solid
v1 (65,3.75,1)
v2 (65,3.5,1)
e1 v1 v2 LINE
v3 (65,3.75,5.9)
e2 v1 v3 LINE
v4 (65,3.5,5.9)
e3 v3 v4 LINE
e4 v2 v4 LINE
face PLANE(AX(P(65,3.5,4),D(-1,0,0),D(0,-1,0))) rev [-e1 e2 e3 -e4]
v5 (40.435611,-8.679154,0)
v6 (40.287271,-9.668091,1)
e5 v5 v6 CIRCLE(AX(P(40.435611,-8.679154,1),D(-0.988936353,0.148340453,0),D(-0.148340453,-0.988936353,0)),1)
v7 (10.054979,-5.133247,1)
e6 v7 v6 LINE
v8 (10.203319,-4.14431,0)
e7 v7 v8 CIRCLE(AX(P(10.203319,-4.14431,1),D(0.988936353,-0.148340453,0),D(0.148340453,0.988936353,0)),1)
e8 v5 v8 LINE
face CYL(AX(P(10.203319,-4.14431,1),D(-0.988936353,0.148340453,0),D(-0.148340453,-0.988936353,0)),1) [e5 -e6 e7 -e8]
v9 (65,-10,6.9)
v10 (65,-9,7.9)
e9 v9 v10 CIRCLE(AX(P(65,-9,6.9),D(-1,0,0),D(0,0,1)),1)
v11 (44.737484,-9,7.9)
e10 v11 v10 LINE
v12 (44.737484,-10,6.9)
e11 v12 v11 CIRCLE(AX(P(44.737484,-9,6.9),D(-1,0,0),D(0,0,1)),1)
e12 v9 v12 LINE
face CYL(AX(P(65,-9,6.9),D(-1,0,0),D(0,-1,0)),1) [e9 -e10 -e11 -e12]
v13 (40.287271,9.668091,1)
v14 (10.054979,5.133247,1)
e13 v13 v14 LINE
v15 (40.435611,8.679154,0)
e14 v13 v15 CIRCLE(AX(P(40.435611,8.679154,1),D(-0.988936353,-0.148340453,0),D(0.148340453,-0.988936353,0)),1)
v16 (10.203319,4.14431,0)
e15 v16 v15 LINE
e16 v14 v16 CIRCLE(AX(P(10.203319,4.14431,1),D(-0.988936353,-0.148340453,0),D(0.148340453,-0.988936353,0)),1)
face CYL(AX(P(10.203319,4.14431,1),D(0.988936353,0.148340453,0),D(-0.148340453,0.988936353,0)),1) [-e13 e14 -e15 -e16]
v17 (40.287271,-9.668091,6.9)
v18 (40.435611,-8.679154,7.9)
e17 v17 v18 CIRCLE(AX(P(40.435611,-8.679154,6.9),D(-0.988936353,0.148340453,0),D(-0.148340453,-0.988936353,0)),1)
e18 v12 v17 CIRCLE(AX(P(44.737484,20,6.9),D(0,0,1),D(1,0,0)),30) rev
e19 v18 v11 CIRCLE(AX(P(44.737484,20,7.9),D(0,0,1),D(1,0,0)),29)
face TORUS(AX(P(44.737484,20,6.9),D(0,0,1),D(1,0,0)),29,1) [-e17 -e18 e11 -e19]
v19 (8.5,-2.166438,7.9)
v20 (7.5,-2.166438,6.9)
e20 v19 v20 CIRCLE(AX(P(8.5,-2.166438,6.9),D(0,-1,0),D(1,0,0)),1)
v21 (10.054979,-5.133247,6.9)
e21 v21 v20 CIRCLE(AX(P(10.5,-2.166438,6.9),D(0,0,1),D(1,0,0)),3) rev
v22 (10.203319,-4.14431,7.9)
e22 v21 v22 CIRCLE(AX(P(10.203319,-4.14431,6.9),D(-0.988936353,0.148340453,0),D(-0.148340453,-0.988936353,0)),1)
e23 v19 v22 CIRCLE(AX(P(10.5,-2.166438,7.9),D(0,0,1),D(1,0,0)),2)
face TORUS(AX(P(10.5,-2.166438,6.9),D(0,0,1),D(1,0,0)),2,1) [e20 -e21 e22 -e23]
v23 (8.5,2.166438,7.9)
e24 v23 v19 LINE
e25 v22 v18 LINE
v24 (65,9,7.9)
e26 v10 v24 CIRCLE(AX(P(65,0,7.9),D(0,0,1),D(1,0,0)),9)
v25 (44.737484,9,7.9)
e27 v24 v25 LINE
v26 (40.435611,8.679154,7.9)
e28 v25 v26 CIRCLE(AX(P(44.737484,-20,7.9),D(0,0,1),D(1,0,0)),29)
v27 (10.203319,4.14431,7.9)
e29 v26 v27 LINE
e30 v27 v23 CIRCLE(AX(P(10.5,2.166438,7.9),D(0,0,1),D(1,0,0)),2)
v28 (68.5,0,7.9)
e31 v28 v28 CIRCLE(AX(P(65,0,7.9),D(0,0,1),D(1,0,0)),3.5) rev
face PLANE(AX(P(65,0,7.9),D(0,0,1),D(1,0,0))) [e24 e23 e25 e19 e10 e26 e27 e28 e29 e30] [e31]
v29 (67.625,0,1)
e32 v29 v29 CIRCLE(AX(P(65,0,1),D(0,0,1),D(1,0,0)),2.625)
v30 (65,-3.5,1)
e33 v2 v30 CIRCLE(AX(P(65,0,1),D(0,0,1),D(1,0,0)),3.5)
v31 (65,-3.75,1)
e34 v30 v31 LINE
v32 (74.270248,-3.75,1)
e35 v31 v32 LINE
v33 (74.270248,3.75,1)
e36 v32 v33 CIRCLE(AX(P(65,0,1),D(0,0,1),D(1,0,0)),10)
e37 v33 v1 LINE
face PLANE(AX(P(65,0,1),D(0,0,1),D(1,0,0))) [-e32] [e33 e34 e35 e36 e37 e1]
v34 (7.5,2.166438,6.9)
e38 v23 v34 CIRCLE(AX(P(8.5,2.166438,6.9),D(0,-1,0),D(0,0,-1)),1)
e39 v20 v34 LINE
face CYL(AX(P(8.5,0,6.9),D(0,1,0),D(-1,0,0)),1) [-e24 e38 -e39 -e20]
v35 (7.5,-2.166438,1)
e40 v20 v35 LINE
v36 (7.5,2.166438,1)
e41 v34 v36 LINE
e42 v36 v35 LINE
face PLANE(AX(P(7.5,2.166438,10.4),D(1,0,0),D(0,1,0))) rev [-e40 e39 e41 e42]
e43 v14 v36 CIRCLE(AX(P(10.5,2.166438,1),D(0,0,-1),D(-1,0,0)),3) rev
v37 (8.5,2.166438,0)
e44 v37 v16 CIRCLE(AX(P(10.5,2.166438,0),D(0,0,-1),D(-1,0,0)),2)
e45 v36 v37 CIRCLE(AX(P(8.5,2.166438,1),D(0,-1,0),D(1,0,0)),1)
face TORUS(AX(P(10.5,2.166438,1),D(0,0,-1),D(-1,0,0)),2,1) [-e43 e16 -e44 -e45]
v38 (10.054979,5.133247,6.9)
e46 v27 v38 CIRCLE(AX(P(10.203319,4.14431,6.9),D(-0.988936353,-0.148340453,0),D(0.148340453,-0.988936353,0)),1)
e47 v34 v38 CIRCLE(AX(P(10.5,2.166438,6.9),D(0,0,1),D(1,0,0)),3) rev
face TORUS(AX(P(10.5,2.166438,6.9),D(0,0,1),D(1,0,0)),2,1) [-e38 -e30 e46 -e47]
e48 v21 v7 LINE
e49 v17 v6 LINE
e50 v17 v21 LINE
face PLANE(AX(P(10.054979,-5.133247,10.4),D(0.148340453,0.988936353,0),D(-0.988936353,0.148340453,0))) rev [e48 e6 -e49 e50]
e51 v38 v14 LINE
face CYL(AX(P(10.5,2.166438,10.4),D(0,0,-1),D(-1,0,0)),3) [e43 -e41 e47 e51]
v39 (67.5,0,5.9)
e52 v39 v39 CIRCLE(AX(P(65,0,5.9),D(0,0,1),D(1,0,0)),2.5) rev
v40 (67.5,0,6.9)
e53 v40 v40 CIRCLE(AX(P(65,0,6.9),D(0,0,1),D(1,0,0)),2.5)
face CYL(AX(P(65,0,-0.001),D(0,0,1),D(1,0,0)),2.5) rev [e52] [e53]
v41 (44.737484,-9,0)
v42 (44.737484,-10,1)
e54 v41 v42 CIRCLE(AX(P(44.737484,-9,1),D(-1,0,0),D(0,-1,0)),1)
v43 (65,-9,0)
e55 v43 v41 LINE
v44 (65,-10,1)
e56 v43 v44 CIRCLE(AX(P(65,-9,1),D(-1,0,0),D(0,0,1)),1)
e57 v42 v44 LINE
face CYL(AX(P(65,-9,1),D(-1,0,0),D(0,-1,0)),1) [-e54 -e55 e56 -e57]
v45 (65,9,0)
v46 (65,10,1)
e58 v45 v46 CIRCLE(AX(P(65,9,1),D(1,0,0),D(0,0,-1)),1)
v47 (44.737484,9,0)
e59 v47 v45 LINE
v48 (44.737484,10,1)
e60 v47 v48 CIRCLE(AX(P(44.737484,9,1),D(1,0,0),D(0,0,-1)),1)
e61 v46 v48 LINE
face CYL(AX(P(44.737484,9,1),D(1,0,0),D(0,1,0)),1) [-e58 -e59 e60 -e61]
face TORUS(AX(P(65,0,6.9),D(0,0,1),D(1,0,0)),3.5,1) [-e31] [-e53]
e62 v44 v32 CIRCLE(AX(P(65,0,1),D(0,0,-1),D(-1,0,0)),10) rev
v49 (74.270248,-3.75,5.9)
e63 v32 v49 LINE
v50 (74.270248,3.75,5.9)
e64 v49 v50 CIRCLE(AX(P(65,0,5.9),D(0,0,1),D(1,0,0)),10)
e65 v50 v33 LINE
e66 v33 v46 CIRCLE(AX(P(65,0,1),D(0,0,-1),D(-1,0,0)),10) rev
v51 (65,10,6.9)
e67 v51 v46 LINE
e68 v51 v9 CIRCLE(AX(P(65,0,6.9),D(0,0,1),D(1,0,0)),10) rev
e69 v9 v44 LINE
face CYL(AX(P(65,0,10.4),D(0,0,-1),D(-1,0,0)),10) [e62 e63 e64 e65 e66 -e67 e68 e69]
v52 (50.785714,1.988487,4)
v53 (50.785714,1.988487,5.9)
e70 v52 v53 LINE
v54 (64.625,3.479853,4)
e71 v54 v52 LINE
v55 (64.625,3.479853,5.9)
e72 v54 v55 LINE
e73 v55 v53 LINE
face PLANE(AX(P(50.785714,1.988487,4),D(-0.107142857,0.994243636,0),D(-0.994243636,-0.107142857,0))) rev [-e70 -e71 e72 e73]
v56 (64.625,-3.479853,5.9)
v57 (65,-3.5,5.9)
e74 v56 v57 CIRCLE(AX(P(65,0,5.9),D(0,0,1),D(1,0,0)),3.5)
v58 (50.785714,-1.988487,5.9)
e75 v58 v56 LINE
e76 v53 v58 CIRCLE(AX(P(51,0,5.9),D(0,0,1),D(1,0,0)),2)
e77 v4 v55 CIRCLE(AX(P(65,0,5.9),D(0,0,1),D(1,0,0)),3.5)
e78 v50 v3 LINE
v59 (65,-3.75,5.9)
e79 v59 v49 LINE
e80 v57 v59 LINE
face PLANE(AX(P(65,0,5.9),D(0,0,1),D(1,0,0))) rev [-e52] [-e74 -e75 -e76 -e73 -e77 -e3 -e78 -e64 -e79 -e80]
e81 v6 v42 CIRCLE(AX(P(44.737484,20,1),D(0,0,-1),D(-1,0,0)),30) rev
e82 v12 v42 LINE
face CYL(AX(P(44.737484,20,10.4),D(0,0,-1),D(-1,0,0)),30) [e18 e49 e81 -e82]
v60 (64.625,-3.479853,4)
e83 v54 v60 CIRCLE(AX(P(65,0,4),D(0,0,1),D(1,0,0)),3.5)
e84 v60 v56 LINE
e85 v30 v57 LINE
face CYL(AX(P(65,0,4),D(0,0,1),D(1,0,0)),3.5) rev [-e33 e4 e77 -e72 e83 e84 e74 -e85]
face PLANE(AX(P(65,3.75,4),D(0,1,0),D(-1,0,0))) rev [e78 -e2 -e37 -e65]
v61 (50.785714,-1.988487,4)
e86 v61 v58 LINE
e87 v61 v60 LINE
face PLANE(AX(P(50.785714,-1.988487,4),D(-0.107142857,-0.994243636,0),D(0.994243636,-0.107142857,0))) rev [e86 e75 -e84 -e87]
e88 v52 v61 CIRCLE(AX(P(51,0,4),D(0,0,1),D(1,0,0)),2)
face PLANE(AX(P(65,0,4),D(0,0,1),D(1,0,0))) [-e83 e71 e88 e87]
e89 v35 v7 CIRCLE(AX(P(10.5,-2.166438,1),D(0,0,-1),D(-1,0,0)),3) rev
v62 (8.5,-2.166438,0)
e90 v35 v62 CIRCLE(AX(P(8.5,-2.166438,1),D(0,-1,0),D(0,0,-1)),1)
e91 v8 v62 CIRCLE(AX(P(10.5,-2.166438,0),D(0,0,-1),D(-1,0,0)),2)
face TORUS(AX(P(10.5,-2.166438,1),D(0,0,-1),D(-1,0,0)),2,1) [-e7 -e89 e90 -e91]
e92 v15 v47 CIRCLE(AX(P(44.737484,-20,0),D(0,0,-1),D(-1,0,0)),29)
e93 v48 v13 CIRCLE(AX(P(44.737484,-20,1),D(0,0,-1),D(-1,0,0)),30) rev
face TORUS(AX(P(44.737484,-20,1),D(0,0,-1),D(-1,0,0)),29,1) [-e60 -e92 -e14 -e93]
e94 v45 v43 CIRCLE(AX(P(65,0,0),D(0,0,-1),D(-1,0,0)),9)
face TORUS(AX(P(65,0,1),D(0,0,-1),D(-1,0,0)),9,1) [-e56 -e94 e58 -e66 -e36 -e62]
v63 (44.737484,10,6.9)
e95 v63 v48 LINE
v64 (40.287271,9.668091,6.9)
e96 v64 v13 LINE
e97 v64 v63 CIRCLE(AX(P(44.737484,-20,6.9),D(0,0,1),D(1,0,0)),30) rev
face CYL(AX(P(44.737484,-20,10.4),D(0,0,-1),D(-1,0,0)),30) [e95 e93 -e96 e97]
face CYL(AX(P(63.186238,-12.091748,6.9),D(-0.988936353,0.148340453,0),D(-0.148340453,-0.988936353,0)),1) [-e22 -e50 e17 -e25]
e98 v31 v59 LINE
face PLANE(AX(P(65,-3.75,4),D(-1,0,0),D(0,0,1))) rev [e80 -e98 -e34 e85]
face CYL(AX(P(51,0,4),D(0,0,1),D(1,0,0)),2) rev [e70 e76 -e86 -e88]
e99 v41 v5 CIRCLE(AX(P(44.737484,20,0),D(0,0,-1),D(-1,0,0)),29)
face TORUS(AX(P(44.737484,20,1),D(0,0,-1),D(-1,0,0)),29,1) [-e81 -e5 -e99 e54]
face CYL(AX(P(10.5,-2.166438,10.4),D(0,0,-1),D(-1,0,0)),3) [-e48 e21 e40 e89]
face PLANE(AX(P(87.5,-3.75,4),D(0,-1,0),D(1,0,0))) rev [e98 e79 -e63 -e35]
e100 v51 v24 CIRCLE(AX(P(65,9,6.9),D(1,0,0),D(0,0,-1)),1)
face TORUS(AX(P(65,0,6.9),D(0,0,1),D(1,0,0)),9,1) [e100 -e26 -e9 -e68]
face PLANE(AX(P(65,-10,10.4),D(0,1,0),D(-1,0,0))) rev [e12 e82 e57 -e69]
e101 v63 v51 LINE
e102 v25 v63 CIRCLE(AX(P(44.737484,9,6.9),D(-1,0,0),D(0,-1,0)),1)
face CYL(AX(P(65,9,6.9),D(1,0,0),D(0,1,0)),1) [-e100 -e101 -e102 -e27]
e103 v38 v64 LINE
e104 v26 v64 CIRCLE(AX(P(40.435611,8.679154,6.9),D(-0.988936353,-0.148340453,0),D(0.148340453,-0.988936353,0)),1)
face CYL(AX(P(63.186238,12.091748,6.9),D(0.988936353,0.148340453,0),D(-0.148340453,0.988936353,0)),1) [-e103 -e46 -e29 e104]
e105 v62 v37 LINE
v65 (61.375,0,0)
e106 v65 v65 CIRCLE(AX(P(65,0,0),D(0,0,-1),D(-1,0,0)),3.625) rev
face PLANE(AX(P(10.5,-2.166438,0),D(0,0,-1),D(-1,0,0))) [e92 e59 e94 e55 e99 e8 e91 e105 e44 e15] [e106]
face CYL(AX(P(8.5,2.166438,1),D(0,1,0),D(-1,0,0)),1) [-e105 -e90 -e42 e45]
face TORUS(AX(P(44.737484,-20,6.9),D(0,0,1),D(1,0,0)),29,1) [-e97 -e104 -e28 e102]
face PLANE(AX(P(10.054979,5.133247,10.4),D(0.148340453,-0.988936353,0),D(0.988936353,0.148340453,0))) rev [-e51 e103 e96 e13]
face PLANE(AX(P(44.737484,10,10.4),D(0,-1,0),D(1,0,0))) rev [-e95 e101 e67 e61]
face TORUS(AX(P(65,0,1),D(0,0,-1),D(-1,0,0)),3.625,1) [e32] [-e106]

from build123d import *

# Parameters (mm, degrees)
BOSS_EXTRU_2_DEPTH      = 10.4
ESQUISSE2_R             = 2.5
ENL_V_MAT_EXTRU_1_DEPTH = 2.5
ENL_V_MAT_EXTRU_2_DEPTH = 1.9
ENL_V_MAT_EXTRU_3_DEPTH = 3
ESQUISSE6_R             = 2.625
ENL_V_MAT_EXTRU_4_DEPTH = 77.245393303
ESQUISSE8_W             = 4.091090074
ESQUISSE8_H             = 23.887427299
ENL_V_MAT_EXTRU_5_DEPTH = 79
ENL_V_MAT_EXTRU_6_REACH = 78.075
ESQUISSE9_R             = 2.5
CONG_2_R                = 1
CONG_3_R                = 1


with BuildPart() as part:
    # Esquisse1 → Boss.-Extru.2 (new body)
    with BuildSketch(Plane.XY):
        with BuildLine():
            Line((44.737484162, 10), (65, 10))
            ThreePointArc((65, 10), (75, 0), (65, -10))
            Line((65, -10), (44.737484162, -10))
            ThreePointArc((44.737484162, -10), (42.506197266, -9.916907574), (40.287270574, -9.668090586))
            Line((40.287270574, -9.668090586), (10.054978641, -5.133246796))
            ThreePointArc((10.054978641, -5.133246796), (8.226779369, -4.12410675), (7.5, -2.166437738))
            Line((7.5, -2.166437738), (7.5, 2.166437738))
            ThreePointArc((7.5, 2.166437738), (8.226779369, 4.12410675), (10.054978641, 5.133246796))
            Line((10.054978641, 5.133246796), (40.287270574, 9.668090586))
            ThreePointArc((40.287270574, 9.668090586), (42.506197266, 9.916907574), (44.737484162, 10))
        make_face()
    extrude(amount=BOSS_EXTRU_2_DEPTH)

    # Esquisse2 → Enlèv. mat.-Extru.1 (cut)
    with BuildSketch(Plane.XY.offset(10.4)):
        with Locations((65, 0)):
            Circle(ESQUISSE2_R)
    extrude(amount=-ENL_V_MAT_EXTRU_1_DEPTH, mode=Mode.SUBTRACT)

    # Esquisse3 → Enlèv. mat.-Extru.2 (cut)
    with BuildSketch(Plane.XY.offset(5.9)):
        with BuildLine():
            Line((87.5, 3.75), (87.5, -3.75))
            Line((87.5, -3.75), (65, -3.75))
            Line((65, -3.75), (65, -3.5))
            ThreePointArc((65, -3.5), (64.812229587, -3.494959552), (64.625, -3.479852727))
            Line((64.625, -3.479852727), (50.785714286, -1.988487272))
            ThreePointArc((50.785714286, -1.988487272), (49, 0), (50.785714286, 1.988487272))
            Line((50.785714286, 1.988487272), (64.625, 3.479852727))
            ThreePointArc((64.625, 3.479852727), (64.812229587, 3.494959552), (65, 3.5))
            Line((65, 3.5), (65, 3.75))
            Line((65, 3.75), (87.5, 3.75))
        make_face()
    extrude(amount=-ENL_V_MAT_EXTRU_2_DEPTH, mode=Mode.SUBTRACT)

    # Esquisse4 → Enlèv. mat.-Extru.3 (cut)
    with BuildSketch(Plane.XY.offset(4)):
        with BuildLine():
            Line((65, 3.5), (65, 3.75))
            Line((65, 3.75), (88.077593775, 3.75))
            Line((88.077593775, 3.75), (88.077593775, -3.75))
            Line((88.077593775, -3.75), (65, -3.75))
            Line((65, -3.75), (65, -3.5))
            ThreePointArc((65, -3.5), (61.5, 0), (65, 3.5))
        make_face()
    extrude(amount=-ENL_V_MAT_EXTRU_3_DEPTH, mode=Mode.SUBTRACT)

    # Esquisse6 → Enlèv. mat.-Extru.4 (cut, through all)
    with BuildSketch(Plane.XY.offset(1)):
        with Locations((65, 0)):
            Circle(ESQUISSE6_R)
    extrude(amount=-ENL_V_MAT_EXTRU_4_DEPTH, mode=Mode.SUBTRACT)

    # Esquisse8 → Enlèv. mat.-Extru.5 (cut)
    with BuildSketch(Plane(origin=(0, 0, 0), x_dir=(0, 0, -1), z_dir=(1, 0, 0))):
        with Locations((-9.945545037, 0.586827687)):
            Rectangle(ESQUISSE8_W, ESQUISSE8_H)
    extrude(amount=ENL_V_MAT_EXTRU_5_DEPTH, mode=Mode.SUBTRACT)

    # Esquisse9 → Enlèv. mat.-Extru.6 (cut, up to next)
    with BuildSketch(Plane.XY.offset(7.9), mode=Mode.PRIVATE) as enl_v_mat_extru_6_sk1:
        with Locations((65, 0)):
            Circle(ESQUISSE9_R)
    enl_v_mat_extru_6_tool1 = extrude(enl_v_mat_extru_6_sk1.sketch, amount=-ENL_V_MAT_EXTRU_6_REACH, mode=Mode.PRIVATE) & part.part
    add(enl_v_mat_extru_6_tool1.solids().sort_by_distance((65, 0, 7.9))[0], mode=Mode.SUBTRACT)

    # Congé2
    cong_2_edges = [part.edges().sort_by_distance(p)[0] for p in [
        (8.226779369, -4.12410675, 7.9),
        (25.171124608, -7.400668691, 7.9),
        (42.506197266, -9.916907574, 7.9),
        (54.868742081, -10, 7.9),
        (75, 0, 7.9),
        (54.868742081, 10, 7.9),
        (42.506197266, 9.916907574, 7.9),
        (25.171124608, 7.400668691, 7.9),
        (8.226779369, 4.12410675, 7.9),
        (7.5, 0, 7.9),
        (62.5, 0, 7.9),
    ]]
    fillet(cong_2_edges, radius=CONG_2_R)

    # Congé3
    cong_3_edges = [part.edges().sort_by_distance(p)[0] for p in [
        (7.5, 0, 0),
        (8.226779369, 4.12410675, 0),
        (25.171124608, 7.400668691, 0),
        (42.506197266, 9.916907574, 0),
        (54.868742081, 10, 0),
        (75, 0, 0),
        (54.868742081, -10, 0),
        (42.506197266, -9.916907574, 0),
        (25.171124608, -7.400668691, 0),
        (8.226779369, -4.12410675, 0),
        (62.375, 0, 0),
    ]]
    fillet(cong_3_edges, radius=CONG_3_R - 0.0001)  # a hair under: the kernel refuses the full size


solid = part.part
